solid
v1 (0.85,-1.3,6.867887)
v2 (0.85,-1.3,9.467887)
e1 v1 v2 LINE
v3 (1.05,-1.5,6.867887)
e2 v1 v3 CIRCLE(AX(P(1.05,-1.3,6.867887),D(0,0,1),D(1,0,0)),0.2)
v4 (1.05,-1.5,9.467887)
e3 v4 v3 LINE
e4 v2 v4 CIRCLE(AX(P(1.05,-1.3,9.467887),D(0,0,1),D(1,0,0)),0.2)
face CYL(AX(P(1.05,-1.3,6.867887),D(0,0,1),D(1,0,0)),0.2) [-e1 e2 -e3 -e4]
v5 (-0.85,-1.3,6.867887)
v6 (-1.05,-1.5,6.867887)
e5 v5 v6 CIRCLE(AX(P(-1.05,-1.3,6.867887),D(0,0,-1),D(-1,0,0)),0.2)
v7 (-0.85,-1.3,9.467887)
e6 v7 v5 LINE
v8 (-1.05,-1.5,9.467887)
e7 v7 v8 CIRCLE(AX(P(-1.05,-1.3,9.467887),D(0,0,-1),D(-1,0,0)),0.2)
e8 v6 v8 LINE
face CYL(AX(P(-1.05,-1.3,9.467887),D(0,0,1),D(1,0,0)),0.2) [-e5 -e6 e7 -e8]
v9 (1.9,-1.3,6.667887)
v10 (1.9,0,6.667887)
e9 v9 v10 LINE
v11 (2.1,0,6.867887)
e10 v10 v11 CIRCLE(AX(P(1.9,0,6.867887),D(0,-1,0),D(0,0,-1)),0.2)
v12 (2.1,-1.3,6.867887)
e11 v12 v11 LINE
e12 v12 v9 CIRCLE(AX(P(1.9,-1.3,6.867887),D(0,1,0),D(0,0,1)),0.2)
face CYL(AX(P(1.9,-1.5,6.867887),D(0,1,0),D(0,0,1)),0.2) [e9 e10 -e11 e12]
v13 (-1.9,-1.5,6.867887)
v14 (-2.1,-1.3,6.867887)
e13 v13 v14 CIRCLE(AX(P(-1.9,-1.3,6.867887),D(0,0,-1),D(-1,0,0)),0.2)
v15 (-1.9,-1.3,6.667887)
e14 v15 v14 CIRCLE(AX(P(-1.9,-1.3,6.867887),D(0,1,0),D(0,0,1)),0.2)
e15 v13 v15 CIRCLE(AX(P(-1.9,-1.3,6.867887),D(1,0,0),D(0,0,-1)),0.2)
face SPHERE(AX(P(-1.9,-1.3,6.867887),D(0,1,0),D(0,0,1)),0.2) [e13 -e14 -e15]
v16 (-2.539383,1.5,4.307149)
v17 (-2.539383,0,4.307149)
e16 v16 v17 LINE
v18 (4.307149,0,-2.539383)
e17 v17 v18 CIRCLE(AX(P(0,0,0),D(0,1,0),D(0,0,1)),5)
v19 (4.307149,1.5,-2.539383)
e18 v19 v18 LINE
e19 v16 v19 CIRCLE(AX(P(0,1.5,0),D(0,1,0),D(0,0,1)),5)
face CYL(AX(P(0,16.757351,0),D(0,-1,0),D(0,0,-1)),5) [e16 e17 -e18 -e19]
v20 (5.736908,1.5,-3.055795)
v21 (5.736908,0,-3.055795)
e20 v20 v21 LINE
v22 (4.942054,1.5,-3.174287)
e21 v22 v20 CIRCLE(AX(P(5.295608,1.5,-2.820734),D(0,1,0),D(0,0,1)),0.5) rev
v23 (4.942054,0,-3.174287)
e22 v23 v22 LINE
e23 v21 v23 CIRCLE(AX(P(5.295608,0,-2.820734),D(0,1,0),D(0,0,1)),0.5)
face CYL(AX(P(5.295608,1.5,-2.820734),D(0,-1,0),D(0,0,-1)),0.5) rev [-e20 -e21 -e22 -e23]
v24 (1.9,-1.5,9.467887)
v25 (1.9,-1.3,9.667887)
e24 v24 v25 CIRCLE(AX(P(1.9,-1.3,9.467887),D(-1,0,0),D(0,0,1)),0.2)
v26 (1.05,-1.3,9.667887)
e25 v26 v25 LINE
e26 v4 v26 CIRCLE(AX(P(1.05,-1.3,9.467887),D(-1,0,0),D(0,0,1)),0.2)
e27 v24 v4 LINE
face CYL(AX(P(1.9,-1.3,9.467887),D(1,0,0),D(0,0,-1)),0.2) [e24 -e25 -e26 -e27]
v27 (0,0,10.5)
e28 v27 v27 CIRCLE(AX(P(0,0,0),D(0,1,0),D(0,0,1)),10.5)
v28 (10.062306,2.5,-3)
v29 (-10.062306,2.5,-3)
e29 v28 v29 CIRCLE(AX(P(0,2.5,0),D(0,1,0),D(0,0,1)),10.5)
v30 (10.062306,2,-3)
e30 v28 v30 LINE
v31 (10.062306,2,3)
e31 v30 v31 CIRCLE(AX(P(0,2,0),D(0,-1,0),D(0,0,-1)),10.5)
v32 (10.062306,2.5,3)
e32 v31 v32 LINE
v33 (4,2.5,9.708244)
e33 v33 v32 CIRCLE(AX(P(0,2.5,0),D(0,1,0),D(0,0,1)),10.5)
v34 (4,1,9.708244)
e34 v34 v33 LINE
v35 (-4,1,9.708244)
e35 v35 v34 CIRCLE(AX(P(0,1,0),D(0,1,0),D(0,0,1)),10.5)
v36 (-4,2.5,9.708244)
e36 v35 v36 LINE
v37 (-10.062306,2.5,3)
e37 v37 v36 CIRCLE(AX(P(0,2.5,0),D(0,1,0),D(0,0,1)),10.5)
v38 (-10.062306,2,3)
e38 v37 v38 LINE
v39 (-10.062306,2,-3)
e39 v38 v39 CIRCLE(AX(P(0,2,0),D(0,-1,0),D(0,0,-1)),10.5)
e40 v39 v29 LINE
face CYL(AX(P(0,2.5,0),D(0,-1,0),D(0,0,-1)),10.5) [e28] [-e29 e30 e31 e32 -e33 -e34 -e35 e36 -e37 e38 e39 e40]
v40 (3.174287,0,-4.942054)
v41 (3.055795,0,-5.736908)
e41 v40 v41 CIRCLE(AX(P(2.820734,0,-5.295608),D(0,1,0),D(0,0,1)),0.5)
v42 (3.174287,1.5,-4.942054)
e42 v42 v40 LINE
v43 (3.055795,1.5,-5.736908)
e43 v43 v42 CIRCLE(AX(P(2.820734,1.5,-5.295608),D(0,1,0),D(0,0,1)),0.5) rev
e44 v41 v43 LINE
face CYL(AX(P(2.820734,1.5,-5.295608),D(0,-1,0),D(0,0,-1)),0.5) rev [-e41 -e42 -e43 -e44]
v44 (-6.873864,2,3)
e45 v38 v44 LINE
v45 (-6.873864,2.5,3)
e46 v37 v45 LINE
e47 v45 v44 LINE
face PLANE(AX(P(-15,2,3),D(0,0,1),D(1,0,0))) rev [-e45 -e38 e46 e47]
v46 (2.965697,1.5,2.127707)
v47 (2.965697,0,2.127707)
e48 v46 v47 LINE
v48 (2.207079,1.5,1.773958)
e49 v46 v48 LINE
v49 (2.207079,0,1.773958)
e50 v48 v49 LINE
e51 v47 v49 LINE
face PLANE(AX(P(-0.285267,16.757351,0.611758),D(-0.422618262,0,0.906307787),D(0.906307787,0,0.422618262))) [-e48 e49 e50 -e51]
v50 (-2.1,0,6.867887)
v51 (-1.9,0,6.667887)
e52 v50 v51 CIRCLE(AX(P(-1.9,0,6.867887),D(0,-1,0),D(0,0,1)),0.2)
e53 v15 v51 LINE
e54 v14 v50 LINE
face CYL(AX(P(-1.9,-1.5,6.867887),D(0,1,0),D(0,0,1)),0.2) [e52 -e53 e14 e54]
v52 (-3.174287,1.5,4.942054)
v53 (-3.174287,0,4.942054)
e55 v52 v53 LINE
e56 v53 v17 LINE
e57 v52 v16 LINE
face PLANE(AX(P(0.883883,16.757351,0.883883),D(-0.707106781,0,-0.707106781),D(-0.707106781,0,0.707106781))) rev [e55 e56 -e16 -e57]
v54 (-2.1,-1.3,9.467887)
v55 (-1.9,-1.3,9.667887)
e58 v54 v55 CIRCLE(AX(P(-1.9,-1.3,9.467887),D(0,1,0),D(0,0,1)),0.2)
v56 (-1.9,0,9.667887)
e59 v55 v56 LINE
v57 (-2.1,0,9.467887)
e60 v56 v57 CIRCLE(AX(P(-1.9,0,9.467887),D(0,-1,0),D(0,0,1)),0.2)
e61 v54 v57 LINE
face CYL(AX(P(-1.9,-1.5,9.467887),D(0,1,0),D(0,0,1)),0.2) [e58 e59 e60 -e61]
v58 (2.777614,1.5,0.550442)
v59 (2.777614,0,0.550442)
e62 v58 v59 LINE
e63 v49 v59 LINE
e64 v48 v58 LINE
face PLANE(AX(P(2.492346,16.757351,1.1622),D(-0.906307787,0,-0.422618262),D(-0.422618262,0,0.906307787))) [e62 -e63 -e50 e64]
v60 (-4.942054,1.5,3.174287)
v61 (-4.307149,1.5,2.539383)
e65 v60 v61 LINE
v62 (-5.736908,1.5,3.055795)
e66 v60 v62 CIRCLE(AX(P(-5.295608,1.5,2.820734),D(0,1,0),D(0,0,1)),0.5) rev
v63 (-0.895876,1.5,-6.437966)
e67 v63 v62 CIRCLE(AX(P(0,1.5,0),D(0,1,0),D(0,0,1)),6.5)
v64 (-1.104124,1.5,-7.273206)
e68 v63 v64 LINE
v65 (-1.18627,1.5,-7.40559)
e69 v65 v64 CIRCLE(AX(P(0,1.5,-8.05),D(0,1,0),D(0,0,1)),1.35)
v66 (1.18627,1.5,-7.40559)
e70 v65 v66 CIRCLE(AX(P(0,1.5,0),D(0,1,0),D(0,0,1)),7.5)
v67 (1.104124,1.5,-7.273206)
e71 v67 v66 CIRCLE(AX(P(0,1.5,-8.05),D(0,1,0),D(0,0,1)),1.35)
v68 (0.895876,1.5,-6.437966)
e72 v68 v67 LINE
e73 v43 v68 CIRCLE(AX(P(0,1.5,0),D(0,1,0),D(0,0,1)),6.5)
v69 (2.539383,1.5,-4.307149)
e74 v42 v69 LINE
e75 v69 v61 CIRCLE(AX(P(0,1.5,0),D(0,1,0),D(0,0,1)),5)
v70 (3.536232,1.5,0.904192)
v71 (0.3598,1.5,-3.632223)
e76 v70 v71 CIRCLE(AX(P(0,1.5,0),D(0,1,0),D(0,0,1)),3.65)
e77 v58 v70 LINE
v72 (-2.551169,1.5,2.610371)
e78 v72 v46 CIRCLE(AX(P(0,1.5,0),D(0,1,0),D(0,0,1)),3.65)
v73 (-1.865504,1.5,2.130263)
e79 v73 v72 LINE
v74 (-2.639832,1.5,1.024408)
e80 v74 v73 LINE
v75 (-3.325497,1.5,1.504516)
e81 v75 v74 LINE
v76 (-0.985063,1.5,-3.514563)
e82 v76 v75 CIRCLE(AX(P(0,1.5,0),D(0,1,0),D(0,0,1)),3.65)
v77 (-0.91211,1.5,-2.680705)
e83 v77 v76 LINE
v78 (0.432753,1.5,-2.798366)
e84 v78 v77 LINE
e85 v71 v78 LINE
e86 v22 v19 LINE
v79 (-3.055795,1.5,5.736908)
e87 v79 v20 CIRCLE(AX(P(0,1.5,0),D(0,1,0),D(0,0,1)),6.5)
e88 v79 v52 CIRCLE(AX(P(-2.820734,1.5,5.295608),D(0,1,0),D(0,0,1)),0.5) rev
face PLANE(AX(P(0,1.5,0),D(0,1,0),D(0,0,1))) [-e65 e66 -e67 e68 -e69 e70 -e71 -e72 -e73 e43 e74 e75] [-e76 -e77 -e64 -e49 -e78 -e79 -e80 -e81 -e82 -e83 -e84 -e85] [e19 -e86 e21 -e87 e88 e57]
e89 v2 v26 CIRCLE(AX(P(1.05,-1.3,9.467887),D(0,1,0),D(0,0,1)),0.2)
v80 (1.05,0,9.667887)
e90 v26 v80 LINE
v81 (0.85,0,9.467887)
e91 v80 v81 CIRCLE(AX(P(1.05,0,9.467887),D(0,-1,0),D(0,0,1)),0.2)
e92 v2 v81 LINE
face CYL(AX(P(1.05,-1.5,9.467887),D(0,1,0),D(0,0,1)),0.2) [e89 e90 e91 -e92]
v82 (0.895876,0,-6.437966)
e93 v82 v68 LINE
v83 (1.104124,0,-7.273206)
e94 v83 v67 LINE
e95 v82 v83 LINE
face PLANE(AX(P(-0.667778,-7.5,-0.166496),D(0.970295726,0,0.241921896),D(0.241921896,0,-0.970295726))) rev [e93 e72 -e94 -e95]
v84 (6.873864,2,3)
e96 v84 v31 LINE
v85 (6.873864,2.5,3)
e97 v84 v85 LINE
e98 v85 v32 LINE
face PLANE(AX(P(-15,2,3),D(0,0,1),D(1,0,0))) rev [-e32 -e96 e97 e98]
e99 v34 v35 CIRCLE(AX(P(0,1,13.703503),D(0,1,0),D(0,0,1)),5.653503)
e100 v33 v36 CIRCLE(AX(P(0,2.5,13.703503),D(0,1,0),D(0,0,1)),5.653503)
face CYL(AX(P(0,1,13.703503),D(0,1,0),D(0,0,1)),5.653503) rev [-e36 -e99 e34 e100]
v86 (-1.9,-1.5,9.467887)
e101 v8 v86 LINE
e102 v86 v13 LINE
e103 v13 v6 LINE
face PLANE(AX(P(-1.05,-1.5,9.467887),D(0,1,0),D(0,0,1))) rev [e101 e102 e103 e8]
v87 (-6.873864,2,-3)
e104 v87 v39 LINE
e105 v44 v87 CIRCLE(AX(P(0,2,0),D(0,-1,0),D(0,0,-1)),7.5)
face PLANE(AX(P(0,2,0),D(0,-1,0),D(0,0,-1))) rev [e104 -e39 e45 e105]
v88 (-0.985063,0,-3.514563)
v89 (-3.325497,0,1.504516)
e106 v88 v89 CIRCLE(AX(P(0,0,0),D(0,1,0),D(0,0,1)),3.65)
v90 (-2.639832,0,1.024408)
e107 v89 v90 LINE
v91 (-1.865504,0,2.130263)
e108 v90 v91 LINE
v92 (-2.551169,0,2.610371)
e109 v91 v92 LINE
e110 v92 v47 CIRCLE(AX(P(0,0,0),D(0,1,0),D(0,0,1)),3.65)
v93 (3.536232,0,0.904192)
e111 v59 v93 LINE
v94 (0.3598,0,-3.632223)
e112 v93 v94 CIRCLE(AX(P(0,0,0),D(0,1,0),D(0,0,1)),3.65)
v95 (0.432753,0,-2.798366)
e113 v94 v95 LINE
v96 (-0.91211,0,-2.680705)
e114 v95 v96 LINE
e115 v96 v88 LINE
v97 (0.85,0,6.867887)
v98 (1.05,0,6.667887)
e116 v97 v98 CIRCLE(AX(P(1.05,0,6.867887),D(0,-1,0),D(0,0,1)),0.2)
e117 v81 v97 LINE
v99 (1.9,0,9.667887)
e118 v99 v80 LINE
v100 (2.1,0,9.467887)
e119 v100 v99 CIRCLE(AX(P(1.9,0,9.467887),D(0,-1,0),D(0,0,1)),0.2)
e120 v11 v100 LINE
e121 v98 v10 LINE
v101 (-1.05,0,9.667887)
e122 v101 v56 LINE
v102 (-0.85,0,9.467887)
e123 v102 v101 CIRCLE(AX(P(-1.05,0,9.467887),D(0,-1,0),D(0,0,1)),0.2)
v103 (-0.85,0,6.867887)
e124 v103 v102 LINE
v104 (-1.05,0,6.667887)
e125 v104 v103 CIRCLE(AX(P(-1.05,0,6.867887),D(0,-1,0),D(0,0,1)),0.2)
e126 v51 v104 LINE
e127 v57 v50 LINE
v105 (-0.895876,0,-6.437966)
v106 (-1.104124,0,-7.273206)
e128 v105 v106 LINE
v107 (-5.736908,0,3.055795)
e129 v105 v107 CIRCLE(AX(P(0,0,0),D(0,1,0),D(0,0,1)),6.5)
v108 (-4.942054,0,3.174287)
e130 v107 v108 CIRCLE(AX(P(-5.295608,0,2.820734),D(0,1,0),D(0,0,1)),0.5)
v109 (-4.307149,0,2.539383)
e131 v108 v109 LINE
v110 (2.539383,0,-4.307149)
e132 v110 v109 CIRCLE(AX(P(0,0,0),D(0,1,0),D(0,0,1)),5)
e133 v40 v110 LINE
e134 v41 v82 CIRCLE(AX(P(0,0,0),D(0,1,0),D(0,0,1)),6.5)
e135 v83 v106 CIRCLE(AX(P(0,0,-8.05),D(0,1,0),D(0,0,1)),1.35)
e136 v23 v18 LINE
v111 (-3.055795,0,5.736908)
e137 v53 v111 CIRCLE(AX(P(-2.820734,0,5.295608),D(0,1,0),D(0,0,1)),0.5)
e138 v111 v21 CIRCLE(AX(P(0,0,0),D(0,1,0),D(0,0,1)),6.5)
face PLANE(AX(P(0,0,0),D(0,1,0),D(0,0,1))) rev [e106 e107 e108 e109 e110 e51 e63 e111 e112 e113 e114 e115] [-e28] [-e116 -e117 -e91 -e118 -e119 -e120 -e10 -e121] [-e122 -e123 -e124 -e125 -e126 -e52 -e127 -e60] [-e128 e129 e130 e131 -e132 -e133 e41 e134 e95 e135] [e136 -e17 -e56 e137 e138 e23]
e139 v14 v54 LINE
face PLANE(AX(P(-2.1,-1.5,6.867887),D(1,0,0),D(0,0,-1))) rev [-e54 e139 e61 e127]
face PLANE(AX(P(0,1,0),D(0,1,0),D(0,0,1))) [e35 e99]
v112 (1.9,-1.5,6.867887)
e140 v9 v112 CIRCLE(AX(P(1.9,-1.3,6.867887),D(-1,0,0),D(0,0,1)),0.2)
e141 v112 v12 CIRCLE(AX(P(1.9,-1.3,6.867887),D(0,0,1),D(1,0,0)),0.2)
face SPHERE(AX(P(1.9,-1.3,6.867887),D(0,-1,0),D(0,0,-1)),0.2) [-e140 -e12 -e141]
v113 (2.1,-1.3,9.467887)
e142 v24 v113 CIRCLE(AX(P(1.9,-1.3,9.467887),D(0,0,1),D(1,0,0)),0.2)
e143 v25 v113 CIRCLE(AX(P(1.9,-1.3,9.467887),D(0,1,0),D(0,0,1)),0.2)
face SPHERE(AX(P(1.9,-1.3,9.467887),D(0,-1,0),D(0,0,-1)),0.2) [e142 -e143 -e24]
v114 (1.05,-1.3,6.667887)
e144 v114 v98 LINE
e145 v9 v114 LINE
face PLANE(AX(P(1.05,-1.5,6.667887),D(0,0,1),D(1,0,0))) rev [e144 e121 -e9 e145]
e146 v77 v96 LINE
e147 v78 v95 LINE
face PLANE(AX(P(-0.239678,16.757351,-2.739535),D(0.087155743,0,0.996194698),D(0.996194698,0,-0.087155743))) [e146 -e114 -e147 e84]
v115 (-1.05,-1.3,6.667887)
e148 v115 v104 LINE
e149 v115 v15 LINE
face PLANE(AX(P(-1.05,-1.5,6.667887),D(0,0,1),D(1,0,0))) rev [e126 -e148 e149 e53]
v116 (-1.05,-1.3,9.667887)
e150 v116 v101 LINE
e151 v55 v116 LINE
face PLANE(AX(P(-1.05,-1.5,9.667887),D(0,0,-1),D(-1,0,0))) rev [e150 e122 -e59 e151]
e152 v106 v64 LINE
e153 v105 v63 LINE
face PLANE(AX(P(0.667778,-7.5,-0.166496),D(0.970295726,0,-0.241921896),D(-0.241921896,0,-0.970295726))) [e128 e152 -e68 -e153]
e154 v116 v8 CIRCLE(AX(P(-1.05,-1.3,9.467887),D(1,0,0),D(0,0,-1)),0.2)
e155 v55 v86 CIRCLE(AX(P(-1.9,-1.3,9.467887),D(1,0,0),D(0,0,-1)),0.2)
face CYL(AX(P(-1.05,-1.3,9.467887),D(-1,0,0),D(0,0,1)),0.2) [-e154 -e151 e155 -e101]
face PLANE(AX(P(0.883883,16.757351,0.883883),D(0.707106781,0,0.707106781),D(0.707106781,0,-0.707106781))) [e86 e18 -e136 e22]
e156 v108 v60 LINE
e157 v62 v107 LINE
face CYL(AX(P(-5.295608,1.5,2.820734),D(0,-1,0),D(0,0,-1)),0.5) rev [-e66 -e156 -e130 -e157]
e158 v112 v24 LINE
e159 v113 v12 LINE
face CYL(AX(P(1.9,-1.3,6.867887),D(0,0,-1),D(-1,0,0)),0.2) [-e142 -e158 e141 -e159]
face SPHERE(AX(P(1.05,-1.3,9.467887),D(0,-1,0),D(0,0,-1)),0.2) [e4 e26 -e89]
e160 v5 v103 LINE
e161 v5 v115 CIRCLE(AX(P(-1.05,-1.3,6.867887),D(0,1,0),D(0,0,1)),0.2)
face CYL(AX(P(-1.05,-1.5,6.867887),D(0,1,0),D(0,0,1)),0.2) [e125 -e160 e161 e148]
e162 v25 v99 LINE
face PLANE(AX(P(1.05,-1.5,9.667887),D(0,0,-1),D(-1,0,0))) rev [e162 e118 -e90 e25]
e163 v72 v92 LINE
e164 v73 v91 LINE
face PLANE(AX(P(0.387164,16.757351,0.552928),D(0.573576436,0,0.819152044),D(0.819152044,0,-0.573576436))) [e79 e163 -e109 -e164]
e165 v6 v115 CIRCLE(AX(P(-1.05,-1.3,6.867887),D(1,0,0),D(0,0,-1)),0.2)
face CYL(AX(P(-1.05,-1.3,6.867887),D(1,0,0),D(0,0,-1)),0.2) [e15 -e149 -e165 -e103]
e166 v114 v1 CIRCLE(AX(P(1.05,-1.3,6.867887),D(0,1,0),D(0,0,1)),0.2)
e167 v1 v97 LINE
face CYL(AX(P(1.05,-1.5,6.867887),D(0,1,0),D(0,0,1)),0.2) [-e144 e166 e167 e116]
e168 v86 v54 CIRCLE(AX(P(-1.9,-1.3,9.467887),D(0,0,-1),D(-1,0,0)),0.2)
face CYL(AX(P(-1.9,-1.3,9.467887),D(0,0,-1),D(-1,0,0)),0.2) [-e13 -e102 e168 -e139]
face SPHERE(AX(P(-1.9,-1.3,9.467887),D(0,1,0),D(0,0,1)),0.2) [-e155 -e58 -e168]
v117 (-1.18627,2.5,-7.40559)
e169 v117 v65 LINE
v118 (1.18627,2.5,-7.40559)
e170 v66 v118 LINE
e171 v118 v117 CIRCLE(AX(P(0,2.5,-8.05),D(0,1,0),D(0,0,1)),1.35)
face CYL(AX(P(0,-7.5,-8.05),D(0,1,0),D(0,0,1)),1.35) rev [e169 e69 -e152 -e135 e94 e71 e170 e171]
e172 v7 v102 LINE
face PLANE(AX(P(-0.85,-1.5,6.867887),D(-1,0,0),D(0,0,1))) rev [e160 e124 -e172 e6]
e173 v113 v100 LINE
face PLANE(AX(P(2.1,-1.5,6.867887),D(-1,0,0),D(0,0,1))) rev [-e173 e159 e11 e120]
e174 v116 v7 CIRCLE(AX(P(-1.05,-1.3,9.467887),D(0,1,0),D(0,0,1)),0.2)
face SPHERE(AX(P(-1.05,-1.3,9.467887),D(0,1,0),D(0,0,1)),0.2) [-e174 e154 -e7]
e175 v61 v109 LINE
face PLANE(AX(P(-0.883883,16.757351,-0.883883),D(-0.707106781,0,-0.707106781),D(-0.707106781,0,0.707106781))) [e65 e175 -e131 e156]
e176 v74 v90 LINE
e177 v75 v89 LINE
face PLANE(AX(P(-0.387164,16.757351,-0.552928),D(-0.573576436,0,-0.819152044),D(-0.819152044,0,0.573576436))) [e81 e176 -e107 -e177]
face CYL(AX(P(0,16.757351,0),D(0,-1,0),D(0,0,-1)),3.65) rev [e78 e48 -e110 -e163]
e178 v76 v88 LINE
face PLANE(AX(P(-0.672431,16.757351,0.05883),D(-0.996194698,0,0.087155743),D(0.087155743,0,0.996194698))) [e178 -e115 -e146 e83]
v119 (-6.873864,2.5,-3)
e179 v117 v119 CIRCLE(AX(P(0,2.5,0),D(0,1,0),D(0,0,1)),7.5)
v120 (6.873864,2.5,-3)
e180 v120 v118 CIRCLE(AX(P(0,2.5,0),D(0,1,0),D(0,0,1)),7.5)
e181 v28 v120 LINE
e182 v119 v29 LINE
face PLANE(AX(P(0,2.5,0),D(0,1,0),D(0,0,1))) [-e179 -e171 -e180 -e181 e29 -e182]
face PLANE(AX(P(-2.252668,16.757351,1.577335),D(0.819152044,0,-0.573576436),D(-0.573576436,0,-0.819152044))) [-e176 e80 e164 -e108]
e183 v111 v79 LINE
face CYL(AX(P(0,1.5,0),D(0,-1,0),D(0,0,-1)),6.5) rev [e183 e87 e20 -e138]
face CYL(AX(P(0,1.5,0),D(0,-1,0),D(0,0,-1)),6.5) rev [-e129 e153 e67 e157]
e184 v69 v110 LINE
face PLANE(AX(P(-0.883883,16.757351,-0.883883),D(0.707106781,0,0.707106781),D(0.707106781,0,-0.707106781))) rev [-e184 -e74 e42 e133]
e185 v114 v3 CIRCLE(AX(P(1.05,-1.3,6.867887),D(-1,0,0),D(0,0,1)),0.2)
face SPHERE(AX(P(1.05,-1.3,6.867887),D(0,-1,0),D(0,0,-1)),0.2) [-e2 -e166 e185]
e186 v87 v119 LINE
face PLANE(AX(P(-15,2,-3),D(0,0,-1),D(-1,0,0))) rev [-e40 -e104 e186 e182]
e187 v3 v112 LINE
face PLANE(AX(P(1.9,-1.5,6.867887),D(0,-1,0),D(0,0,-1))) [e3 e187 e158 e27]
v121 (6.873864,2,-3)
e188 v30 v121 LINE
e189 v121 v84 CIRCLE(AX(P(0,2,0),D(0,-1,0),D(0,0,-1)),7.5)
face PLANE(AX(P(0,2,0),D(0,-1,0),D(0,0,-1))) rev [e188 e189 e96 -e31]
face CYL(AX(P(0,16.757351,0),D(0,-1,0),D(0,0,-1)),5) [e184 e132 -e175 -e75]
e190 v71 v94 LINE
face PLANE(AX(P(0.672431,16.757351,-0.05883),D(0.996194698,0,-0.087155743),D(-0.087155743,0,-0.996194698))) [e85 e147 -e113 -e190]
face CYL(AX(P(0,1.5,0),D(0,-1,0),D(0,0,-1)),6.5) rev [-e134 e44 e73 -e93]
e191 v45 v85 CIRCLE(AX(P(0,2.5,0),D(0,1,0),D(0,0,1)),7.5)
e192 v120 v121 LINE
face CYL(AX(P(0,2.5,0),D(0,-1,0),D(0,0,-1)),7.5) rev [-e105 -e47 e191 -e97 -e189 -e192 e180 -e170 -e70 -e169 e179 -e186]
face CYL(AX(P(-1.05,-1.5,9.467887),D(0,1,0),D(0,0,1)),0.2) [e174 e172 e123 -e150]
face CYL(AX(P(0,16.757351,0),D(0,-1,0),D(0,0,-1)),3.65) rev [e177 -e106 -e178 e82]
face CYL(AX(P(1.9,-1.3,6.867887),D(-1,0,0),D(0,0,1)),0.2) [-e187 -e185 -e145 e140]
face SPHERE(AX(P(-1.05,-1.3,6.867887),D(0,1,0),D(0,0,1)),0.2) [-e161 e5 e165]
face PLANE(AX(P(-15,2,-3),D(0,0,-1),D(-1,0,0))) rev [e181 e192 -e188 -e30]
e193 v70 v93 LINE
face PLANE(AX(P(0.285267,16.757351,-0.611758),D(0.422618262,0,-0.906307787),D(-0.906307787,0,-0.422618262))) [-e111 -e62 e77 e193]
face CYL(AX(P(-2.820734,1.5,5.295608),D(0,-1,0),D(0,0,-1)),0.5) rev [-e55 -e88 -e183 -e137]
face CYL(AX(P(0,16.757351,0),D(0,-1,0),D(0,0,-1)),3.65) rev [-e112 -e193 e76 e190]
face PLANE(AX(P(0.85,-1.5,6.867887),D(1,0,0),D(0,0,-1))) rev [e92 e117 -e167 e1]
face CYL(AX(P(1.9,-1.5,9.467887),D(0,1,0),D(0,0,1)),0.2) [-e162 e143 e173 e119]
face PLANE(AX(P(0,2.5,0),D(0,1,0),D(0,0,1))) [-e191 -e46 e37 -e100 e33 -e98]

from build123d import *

# Parameters (mm, degrees)
SKETCH2_R           = 10.5
SKETCH2_R_2         = 7.5
BOSS_EXTRUDE1_DEPTH = 2.5
SKETCH2_3_R         = 7.5
SKETCH2_3_R_2       = 6.5
BOSS_EXTRUDE2_DEPTH = 1.5
SKETCH3_W           = 30
SKETCH3_H           = 6
CUT_EXTRUDE1_DEPTH  = 0.5
CUT_EXTRUDE2_START  = -1.5
CUT_EXTRUDE2_DEPTH  = 1.5
SKETCH5_R           = 5
SKETCH5_R_2         = 3.65
BOSS_EXTRUDE3_DEPTH = 1.5
FILLET1_R           = 0.5
CUT_EXTRUDE3_START  = -2.5
CUT_EXTRUDE3_DEPTH  = 2.5
BOSS_EXTRUDE4_DEPTH = 1.5
FILLET2_R           = 0.2


# Read off the part's stored shape, not the designer's step: Cut-Extrude3
with BuildPart() as part:
    # Sketch2 → Boss-Extrude1 (new body)
    with BuildSketch(Plane(origin=(0, 0, 0), x_dir=(1, 0, 0), z_dir=(0, 1, 0))):
        with Locations(Location((0, 0, 0), (0, 0, 270))):
            Circle(SKETCH2_R)
        with Locations(Location((0, 0, 0), (0, 0, 270))):
            Circle(SKETCH2_R_2, mode=Mode.SUBTRACT)
    extrude(amount=BOSS_EXTRUDE1_DEPTH)

    # Sketch2<3> → Boss-Extrude2 (add)
    with BuildSketch(Plane(origin=(0, 0, 0), x_dir=(1, 0, 0), z_dir=(0, 1, 0))):
        with Locations(Location((0, 0, 0), (0, 0, 270))):
            Circle(SKETCH2_3_R)
        with Locations(Location((0, 0, 0), (0, 0, 270))):
            Circle(SKETCH2_3_R_2, mode=Mode.SUBTRACT)
    extrude(amount=BOSS_EXTRUDE2_DEPTH)

    # Sketch3 → Cut-Extrude1 (cut)
    with BuildSketch(Plane(origin=(0, 2.5, 0), x_dir=(1, 0, 0), z_dir=(0, 1, 0))):
        Rectangle(SKETCH3_W, SKETCH3_H)
    extrude(amount=-CUT_EXTRUDE1_DEPTH, mode=Mode.SUBTRACT)

    # Sketch4 → Cut-Extrude2 (cut)
    with BuildSketch(Plane(origin=(0, 2.5, 0), x_dir=(1, 0, 0), z_dir=(0, 1, 0)).offset(CUT_EXTRUDE2_START)):
        with BuildLine():
            Line((-4, -9.708243919), (4, -9.708243919))
            ThreePointArc((4, -9.708243919), (0, -8.05), (-4, -9.708243919))
        make_face()
        with BuildLine():
            ThreePointArc((-4, -9.708243919), (0, -10.5), (4, -9.708243919))
            Line((4, -9.708243919), (-4, -9.708243919))
        make_face()
    extrude(amount=CUT_EXTRUDE2_DEPTH, mode=Mode.SUBTRACT)

    # Sketch5 → Boss-Extrude3 (add)
    # profile 1 of 6: a face of its own
    with BuildSketch(Plane(origin=(0, 0, 0), x_dir=(1, 0, 0), z_dir=(0, 1, 0))):
        Circle(SKETCH5_R)
        Circle(SKETCH5_R_2, mode=Mode.SUBTRACT)
    # profile 2 of 6: a face of its own
    with BuildSketch(Plane(origin=(0, 0, 0), x_dir=(1, 0, 0), z_dir=(0, 1, 0))):
        with BuildLine():
            Line((-4.307149461, -2.539382508), (-5.394288115, -3.626521162))
            ThreePointArc((-5.394288115, -3.626521162), (-4.596194078, -4.596194078), (-3.626521162, -5.394288115))
            Line((-3.626521162, -5.394288115), (-2.539382508, -4.307149461))
            ThreePointArc((-2.539382508, -4.307149461), (-3.535533906, -3.535533906), (-4.307149461, -2.539382508))
        make_face()
    # profile 3 of 6: a face of its own
    with BuildSketch(Plane(origin=(0, 0, 0), x_dir=(1, 0, 0), z_dir=(0, 1, 0))):
        with BuildLine():
            ThreePointArc((2.965697363, -2.127707487), (3.308023423, -1.542556655), (3.536232016, -0.904191975))
            Line((3.536232016, -0.904191975), (2.777613741, -0.550442464))
            Line((2.777613741, -0.550442464), (2.207079088, -1.773957976))
            Line((2.207079088, -1.773957976), (2.965697363, -2.127707487))
        make_face()
    # profile 4 of 6: a face of its own
    with BuildSketch(Plane(origin=(0, 0, 0), x_dir=(1, 0, 0), z_dir=(0, 1, 0))):
        with BuildLine():
            Line((-2.639832216, -1.02440757), (-3.325497417, -1.504515512))
            ThreePointArc((-3.325497417, -1.504515512), (-2.989904962, -2.093553993), (-2.551169228, -2.610370772))
            Line((-2.551169228, -2.610370772), (-1.865504027, -2.13026283))
            Line((-1.865504027, -2.13026283), (-2.639832216, -1.02440757))
        make_face()
    # profile 5 of 6: a face of its own
    with BuildSketch(Plane(origin=(0, 0, 0), x_dir=(1, 0, 0), z_dir=(0, 1, 0))):
        with BuildLine():
            Line((0.432753129, 2.798365546), (0.359800054, 3.632223))
            ThreePointArc((0.359800054, 3.632223), (-0.318118461, 3.636110648), (-0.985062788, 3.514562747))
            Line((-0.985062788, 3.514562747), (-0.912109714, 2.680705293))
            Line((-0.912109714, 2.680705293), (0.432753129, 2.798365546))
        make_face()
    # profile 6 of 6: a face of its own
    with BuildSketch(Plane(origin=(0, 0, 0), x_dir=(1, 0, 0), z_dir=(0, 1, 0))):
        with BuildLine():
            ThreePointArc((5.394288115, 3.626521162), (4.596194078, 4.596194078), (3.626521162, 5.394288115))
            Line((3.626521162, 5.394288115), (2.539382508, 4.307149461))
            ThreePointArc((2.539382508, 4.307149461), (3.535533906, 3.535533906), (4.307149461, 2.539382508))
            Line((4.307149461, 2.539382508), (5.394288115, 3.626521162))
        make_face()
    extrude(amount=BOSS_EXTRUDE3_DEPTH)

    # Fillet1
    fillet1_edges = [part.edges().sort_by_distance(p)[0] for p in [
        (5.394288115, 0.75, -3.626521162),
        (3.626521162, 0.75, -5.394288115),
        (-5.394288115, 0.75, 3.626521162),
        (-3.626521162, 0.75, 5.394288115),
    ]]
    fillet(fillet1_edges, radius=FILLET1_R)

    # Cut-Extrude3 outline → Cut-Extrude3 (cut)
    with BuildSketch(Plane(origin=(0, 2.5, 0), x_dir=(1, 0, 0), z_dir=(0, 1, 0)).offset(CUT_EXTRUDE3_START)):
        with BuildLine():
            Line((-1.104124308, 7.273205617), (-0.895875692, 6.437966041))
            ThreePointArc((-0.895875692, 6.437966041), (0, 6.5), (0.895875692, 6.437966041))
            Line((0.895875692, 6.437966041), (1.104124308, 7.273205617))
            ThreePointArc((1.104124308, 7.273205617), (0, 9.4), (-1.104124308, 7.273205617))
        make_face()
    extrude(amount=CUT_EXTRUDE3_DEPTH, mode=Mode.SUBTRACT)

    # Sketch7 → Boss-Extrude4 (add)
    with BuildSketch(Plane.XZ):
        with BuildLine():
            Line((1.05, 6.667886814), (1.9, 6.667886814))
            ThreePointArc((1.9, 6.667886814), (2.041421356, 6.726465457), (2.1, 6.867886814))
            Line((2.1, 6.867886814), (2.1, 9.467886814))
            ThreePointArc((2.1, 9.467886814), (2.041421356, 9.60930817), (1.9, 9.667886814))
            Line((1.9, 9.667886814), (1.05, 9.667886814))
            ThreePointArc((1.05, 9.667886814), (0.908578644, 9.60930817), (0.85, 9.467886814))
            Line((0.85, 9.467886814), (0.85, 6.867886814))
            ThreePointArc((0.85, 6.867886814), (0.908578644, 6.726465457), (1.05, 6.667886814))
        make_face()
        with BuildLine():
            Line((-2.1, 6.867886814), (-2.1, 9.467886814))
            ThreePointArc((-2.1, 9.467886814), (-2.041421356, 9.60930817), (-1.9, 9.667886814))
            Line((-1.9, 9.667886814), (-1.05, 9.667886814))
            ThreePointArc((-1.05, 9.667886814), (-0.908578644, 9.60930817), (-0.85, 9.467886814))
            Line((-0.85, 9.467886814), (-0.85, 6.867886814))
            ThreePointArc((-0.85, 6.867886814), (-0.908578644, 6.726465457), (-1.05, 6.667886814))
            Line((-1.05, 6.667886814), (-1.9, 6.667886814))
            ThreePointArc((-1.9, 6.667886814), (-2.041421356, 6.726465457), (-2.1, 6.867886814))
        make_face()
    extrude(amount=BOSS_EXTRUDE4_DEPTH)

    # Fillet2
    fillet2_edges = [part.edges().sort_by_distance(p)[0] for p in [
        (2.041421356, -1.5, 6.726465457),
        (2.1, -1.5, 8.167886814),
        (2.041421356, -1.5, 9.60930817),
        (1.475, -1.5, 9.667886814),
        (0.908578644, -1.5, 9.60930817),
        (0.85, -1.5, 8.167886814),
        (0.908578644, -1.5, 6.726465457),
        (1.475, -1.5, 6.667886814),
        (-0.908578644, -1.5, 9.60930817),
        (-1.475, -1.5, 9.667886814),
        (-2.041421356, -1.5, 9.60930817),
        (-2.1, -1.5, 8.167886814),
        (-2.041421356, -1.5, 6.726465457),
        (-1.475, -1.5, 6.667886814),
        (-0.908578644, -1.5, 6.726465457),
        (-0.85, -1.5, 8.167886814),
    ]]
    fillet(fillet2_edges, radius=FILLET2_R)


solid = part.part
